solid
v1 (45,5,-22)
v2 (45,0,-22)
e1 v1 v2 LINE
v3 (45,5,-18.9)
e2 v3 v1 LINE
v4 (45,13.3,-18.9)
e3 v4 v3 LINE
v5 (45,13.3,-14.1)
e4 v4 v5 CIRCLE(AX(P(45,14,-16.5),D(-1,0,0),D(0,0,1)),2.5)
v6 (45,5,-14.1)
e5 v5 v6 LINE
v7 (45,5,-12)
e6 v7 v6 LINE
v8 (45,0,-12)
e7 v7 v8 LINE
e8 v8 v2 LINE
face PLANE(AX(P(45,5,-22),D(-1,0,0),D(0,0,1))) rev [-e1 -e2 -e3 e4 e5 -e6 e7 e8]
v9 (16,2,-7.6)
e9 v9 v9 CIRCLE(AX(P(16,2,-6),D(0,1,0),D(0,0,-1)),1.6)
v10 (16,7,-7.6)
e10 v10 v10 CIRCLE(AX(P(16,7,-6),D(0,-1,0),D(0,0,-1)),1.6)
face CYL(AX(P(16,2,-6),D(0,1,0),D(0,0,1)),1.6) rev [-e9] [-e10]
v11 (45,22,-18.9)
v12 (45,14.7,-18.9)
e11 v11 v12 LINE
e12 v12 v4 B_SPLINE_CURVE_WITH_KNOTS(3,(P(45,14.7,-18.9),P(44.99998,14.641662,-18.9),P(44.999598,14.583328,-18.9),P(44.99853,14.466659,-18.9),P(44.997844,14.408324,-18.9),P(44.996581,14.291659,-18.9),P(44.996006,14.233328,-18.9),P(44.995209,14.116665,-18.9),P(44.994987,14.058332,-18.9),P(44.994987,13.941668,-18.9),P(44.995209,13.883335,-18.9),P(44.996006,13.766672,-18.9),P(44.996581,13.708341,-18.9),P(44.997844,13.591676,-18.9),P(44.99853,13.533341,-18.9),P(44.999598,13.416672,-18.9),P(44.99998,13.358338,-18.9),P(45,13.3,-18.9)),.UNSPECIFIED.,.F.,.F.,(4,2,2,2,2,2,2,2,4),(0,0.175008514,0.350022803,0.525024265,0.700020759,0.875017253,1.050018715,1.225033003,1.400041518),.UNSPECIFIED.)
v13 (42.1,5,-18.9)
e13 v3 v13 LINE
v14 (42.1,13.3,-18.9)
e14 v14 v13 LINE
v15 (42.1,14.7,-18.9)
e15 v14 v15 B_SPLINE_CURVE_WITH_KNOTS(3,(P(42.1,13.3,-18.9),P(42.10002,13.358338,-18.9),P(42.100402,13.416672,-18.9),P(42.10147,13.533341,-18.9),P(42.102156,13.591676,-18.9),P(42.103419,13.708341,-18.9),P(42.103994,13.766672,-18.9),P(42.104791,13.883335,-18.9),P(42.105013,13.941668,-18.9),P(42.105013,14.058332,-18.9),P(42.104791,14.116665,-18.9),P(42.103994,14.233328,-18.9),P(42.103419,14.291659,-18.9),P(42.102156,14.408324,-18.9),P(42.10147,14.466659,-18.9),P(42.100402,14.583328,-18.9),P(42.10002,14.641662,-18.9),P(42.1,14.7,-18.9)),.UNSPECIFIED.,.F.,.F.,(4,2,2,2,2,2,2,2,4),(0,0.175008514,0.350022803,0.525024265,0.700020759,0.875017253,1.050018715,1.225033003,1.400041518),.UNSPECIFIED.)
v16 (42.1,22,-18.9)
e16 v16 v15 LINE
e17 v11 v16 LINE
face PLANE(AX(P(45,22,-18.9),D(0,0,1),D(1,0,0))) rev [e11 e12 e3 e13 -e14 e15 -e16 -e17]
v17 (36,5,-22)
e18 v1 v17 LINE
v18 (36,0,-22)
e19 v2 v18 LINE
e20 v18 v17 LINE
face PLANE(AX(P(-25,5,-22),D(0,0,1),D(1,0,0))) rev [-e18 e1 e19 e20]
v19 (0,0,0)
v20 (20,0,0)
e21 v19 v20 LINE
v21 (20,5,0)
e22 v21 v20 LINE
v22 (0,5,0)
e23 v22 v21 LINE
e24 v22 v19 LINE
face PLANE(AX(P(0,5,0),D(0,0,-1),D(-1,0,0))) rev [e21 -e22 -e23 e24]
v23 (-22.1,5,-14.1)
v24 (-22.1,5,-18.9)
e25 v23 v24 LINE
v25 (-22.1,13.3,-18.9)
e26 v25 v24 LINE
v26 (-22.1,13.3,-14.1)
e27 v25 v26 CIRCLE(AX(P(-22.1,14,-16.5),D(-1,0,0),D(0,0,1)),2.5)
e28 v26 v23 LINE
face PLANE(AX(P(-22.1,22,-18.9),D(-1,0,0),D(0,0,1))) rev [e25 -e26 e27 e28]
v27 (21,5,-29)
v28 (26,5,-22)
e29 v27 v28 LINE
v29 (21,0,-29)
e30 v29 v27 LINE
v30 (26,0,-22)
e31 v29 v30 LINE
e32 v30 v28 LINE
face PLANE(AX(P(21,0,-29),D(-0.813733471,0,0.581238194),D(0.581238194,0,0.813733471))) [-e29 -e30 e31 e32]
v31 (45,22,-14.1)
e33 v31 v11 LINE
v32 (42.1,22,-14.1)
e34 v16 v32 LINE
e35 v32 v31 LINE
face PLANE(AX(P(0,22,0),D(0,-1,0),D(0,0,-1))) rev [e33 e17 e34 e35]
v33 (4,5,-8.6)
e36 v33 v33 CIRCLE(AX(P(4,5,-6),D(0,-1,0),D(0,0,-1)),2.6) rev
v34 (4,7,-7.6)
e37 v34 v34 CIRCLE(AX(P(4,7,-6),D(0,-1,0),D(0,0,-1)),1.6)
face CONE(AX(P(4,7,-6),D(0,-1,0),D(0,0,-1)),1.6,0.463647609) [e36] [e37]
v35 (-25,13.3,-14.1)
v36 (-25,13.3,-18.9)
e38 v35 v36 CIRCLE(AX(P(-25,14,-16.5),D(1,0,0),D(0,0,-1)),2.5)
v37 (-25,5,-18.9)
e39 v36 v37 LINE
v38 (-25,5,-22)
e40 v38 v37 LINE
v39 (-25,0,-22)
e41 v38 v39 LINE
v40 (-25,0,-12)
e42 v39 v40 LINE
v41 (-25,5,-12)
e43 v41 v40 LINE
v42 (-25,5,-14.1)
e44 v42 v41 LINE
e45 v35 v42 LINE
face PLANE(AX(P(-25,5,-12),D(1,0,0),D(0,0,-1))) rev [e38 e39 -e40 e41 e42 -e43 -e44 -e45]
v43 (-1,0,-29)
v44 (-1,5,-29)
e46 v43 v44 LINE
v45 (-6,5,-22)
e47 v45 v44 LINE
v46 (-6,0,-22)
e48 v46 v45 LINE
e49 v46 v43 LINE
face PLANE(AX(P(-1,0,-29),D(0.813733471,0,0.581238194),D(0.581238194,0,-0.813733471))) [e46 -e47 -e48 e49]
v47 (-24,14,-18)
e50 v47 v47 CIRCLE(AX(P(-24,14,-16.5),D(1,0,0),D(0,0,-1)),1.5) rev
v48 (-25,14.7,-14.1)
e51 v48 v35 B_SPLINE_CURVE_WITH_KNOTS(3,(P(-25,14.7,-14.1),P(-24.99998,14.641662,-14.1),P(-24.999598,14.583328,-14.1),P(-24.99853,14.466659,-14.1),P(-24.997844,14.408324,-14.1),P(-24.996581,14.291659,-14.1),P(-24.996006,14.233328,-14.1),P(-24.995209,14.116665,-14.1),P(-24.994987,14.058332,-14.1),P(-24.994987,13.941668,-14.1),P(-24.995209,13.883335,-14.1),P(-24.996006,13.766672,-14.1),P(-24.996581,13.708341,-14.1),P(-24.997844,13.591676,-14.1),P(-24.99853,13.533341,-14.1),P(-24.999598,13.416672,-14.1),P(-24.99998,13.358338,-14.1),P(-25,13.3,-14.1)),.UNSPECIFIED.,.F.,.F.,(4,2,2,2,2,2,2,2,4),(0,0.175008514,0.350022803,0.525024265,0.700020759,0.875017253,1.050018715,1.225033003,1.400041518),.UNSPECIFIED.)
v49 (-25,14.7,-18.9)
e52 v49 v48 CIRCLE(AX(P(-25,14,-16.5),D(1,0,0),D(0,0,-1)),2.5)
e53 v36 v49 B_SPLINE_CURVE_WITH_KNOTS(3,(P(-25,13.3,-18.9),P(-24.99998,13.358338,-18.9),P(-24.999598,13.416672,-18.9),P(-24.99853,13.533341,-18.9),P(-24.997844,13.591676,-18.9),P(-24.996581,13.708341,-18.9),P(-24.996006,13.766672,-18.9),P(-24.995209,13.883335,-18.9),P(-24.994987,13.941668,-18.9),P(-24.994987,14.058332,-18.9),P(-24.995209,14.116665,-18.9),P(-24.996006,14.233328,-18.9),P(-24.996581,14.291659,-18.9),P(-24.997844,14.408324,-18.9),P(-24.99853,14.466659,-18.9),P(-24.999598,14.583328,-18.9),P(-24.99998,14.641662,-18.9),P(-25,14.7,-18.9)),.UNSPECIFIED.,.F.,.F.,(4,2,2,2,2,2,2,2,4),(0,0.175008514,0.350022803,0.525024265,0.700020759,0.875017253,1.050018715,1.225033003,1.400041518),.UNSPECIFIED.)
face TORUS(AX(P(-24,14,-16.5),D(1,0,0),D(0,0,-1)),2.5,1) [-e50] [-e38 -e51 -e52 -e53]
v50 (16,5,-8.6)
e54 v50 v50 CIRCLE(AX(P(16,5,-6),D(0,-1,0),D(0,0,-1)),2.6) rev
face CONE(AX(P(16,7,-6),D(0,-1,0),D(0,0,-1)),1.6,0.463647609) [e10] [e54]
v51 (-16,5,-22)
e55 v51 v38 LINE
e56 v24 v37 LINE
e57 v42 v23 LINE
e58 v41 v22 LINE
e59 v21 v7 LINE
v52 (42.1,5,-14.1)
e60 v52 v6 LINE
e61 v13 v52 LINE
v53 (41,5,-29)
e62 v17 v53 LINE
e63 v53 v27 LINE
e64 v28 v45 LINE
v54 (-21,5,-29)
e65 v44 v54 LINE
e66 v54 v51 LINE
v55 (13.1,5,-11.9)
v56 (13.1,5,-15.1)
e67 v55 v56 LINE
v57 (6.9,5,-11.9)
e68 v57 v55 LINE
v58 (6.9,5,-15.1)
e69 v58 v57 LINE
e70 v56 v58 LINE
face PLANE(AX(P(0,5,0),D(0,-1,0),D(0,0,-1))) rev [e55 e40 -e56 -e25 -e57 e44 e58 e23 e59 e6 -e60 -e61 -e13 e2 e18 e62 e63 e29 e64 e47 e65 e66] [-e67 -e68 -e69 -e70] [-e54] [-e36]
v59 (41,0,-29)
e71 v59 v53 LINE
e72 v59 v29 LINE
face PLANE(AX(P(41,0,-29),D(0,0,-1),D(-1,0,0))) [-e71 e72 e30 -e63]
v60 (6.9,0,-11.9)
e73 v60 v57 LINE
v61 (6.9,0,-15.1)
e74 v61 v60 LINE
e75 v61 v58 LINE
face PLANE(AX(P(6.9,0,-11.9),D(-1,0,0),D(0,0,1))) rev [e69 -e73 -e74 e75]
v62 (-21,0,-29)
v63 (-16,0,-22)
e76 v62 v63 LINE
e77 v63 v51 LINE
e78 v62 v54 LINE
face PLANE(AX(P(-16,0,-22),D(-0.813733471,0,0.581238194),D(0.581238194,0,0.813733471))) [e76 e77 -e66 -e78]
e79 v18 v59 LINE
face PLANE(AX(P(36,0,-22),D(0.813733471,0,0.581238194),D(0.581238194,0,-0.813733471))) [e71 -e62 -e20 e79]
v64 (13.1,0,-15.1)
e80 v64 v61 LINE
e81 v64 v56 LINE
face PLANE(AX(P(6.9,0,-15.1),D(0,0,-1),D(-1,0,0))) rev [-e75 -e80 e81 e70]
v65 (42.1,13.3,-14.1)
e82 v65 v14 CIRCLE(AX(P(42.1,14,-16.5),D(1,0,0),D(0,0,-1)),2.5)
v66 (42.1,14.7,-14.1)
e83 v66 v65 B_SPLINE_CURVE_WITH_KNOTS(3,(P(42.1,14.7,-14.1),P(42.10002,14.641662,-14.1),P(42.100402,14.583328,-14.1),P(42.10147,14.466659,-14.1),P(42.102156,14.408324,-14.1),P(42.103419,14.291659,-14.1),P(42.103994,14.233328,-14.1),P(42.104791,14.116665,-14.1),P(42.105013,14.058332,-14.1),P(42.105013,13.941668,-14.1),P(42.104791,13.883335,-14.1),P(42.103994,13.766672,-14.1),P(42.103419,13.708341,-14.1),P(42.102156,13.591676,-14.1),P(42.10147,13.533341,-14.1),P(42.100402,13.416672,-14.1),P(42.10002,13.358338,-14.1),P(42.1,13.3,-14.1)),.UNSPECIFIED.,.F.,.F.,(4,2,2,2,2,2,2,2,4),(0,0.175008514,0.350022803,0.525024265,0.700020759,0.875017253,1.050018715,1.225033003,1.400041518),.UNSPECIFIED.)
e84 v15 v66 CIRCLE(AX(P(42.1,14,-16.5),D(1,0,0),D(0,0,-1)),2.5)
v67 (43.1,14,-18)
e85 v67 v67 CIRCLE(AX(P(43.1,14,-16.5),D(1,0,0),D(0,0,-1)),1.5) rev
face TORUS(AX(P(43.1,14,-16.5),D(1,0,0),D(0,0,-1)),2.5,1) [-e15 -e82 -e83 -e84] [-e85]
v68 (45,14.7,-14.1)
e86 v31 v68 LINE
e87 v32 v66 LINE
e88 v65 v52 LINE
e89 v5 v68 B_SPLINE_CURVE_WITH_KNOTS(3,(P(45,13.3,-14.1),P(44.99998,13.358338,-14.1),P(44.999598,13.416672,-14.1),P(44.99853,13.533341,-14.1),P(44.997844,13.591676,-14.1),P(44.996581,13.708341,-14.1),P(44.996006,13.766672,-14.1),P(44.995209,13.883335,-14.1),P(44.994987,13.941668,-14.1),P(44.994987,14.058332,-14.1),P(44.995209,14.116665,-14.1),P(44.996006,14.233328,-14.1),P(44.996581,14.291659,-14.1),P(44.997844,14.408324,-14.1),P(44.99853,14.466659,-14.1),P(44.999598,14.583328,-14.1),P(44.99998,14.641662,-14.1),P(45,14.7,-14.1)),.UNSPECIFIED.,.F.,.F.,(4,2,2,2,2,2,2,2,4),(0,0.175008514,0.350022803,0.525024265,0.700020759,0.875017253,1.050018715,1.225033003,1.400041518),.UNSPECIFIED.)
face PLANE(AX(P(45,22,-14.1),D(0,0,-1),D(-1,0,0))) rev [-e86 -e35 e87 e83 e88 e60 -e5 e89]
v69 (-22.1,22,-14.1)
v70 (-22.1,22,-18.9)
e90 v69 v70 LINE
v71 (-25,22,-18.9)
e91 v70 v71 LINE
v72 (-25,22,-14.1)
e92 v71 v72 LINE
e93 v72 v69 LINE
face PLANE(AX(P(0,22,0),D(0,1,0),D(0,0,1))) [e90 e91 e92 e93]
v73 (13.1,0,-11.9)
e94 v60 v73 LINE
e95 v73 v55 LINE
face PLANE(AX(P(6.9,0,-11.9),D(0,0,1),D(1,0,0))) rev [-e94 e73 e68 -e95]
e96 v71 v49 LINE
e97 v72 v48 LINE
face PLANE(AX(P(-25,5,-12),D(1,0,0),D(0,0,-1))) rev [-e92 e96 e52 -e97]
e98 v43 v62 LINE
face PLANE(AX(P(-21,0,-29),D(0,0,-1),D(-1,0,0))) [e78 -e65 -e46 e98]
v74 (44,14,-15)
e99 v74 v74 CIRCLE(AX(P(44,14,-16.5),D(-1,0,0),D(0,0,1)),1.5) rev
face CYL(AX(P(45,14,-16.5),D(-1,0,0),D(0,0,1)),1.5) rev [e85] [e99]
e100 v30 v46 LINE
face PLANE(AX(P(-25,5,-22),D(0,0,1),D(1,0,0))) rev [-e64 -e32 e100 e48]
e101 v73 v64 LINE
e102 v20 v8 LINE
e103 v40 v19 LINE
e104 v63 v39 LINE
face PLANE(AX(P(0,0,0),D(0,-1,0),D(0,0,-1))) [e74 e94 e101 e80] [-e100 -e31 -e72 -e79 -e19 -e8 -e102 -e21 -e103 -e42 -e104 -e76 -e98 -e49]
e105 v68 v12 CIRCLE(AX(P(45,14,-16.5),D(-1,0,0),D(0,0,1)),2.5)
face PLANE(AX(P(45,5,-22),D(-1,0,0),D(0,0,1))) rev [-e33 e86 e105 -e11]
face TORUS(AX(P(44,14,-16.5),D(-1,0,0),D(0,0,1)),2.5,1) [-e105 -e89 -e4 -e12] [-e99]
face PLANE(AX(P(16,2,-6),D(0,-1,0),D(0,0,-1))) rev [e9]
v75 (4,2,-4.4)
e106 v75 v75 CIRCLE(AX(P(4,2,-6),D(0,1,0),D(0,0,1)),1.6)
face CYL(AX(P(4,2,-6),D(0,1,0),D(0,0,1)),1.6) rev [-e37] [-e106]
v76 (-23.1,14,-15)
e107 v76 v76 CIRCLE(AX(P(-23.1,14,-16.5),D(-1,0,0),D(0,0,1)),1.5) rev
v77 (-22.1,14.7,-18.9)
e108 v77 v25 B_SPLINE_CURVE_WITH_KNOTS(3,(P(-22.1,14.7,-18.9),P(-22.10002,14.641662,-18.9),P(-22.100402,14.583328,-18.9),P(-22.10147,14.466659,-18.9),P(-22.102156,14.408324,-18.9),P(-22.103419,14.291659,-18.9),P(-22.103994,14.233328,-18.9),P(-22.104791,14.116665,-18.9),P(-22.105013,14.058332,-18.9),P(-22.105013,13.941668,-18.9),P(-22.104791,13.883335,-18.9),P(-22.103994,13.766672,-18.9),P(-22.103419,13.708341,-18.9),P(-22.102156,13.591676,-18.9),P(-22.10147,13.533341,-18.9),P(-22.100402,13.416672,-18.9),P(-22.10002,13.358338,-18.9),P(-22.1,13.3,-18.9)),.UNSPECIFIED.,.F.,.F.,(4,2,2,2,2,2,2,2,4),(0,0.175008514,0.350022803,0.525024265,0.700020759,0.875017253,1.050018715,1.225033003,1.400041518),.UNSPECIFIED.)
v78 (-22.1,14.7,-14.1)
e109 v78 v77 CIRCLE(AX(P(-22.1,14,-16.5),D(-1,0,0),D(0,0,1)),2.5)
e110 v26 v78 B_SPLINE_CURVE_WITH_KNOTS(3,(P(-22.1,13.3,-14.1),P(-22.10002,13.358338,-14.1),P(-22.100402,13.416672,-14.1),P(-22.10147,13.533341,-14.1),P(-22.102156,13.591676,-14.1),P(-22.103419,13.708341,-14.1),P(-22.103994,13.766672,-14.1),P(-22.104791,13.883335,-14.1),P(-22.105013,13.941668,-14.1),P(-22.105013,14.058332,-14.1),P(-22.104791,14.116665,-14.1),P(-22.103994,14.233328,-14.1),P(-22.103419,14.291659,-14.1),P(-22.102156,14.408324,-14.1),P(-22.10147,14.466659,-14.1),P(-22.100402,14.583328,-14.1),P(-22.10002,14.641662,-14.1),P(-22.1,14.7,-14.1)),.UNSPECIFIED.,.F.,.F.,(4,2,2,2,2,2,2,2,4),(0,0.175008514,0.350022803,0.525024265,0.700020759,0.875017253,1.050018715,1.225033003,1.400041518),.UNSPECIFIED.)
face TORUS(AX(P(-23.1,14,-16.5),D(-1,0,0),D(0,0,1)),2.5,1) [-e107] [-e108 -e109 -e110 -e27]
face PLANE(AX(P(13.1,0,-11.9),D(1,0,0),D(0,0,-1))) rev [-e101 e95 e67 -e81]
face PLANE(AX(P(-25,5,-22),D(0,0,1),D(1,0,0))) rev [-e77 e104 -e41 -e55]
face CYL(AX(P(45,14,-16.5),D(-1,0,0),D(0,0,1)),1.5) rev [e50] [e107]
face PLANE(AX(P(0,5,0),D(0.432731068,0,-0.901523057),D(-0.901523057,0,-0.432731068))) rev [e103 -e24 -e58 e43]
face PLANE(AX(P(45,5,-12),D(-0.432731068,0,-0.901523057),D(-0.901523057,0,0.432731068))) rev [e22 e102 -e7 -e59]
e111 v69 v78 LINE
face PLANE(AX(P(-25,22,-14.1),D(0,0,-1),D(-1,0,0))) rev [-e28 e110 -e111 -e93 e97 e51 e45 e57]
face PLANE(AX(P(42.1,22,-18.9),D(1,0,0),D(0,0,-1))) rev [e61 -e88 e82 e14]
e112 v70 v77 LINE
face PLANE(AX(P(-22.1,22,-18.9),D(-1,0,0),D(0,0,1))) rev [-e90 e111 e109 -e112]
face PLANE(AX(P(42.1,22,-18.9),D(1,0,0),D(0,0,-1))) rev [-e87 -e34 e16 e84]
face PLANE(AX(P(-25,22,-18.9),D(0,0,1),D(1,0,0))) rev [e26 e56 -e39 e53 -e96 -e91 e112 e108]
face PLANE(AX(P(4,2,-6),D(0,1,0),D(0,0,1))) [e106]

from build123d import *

# Parameters (mm, degrees)
BOSS_EXTRUDE1_DEPTH = 5
SKETCH2_R           = 1.6
CUT_EXTRUDE1_DEPTH  = 3
SKETCH10_W          = 2.9
SKETCH10_H          = 4.8
BOSS_EXTRUDE2_DEPTH = 17
SKETCH9_W           = 6.2
SKETCH9_H           = 3.2
CUT_EXTRUDE4_DEPTH  = 5
SKETCH11_R          = 1.5
CUT_EXTRUDE5_DEPTH  = 70
FILLET3_R           = 1
FILLET4_R           = 1
FILLET6_R           = 1
FILLET7_R           = 1
BOSS_EXTRUDE4_DEPTH = 5


with BuildPart() as part:
    # Sketch1 → Boss-Extrude1 (new body)
    with BuildSketch(Plane(origin=(0, 0, 0), x_dir=(1, 0, 0), z_dir=(0, 1, 0))):
        Polygon((0, 0), (20, 0), (45, 12), (45, 22), (-25, 22), (-25, 12), align=None)
    extrude(amount=BOSS_EXTRUDE1_DEPTH)

    # Sketch2 → Cut-Extrude1 (cut)
    with BuildSketch(Plane(origin=(0, 5, 0), x_dir=(1, 0, 0), z_dir=(0, 1, 0))):
        with Locations(Location((4, 6, 0), (0, 0, 270))):
            Circle(SKETCH2_R)
        with Locations(Location((16, 6, 0), (0, 0, 90))):
            Circle(SKETCH2_R)
    extrude(amount=-CUT_EXTRUDE1_DEPTH, mode=Mode.SUBTRACT)

    # Sketch6 → Revolve1 (revolve)
    with BuildSketch(Plane.XY.offset(-6), mode=Mode.PRIVATE) as revolve1_sk:
        Polygon((2.4, 5), (2.4, 7), (1.4, 5), align=None)
    revolve(revolve1_sk.sketch.rotate(Axis((4, 5, -6), (0, 1, 0)), 270), axis=Axis((4, 5, -6), (0, 1, 0)))

    # Sketch7 → Revolve2 (revolve)
    with BuildSketch(Plane.XY.offset(-6), mode=Mode.PRIVATE) as revolve2_sk:
        Polygon((14.4, 5), (14.4, 7), (13.4, 5), align=None)
    revolve(revolve2_sk.sketch.rotate(Axis((16, 5, -6), (0, 1, 0)), 270), axis=Axis((16, 5, -6), (0, 1, 0)))

    # Sketch10 → Boss-Extrude2 (add)
    with BuildSketch(Plane(origin=(0, 5, 0), x_dir=(1, 0, 0), z_dir=(0, 1, 0))):
        with Locations((-23.55, 16.5)):
            Rectangle(SKETCH10_W, SKETCH10_H)
        with Locations((43.55, 16.5)):
            Rectangle(SKETCH10_W, SKETCH10_H)
    extrude(amount=BOSS_EXTRUDE2_DEPTH)

    # Sketch9 → Cut-Extrude4 (cut)
    with BuildSketch(Plane(origin=(0, 5, 0), x_dir=(1, 0, 0), z_dir=(0, 1, 0))):
        with Locations((10, 13.5)):
            Rectangle(SKETCH9_W, SKETCH9_H)
    extrude(amount=-CUT_EXTRUDE4_DEPTH, mode=Mode.SUBTRACT)

    # Sketch11 → Cut-Extrude5 (cut)
    with BuildSketch(Plane.ZY.offset(25)):
        with Locations((-16.5, 14)):
            Circle(SKETCH11_R)
    extrude(amount=-CUT_EXTRUDE5_DEPTH, mode=Mode.SUBTRACT)

    # Fillet3
    # the kernel refuses this fillet: 1 mm, written as the material it takes off along each edge
    with BuildSketch(Plane(origin=(-25, 14, -16.5), x_dir=(0, 0, 1), z_dir=(0, -1, 0))) as fillet3_piece_1:
        with BuildLine():
            CenterArc((1.5 + FILLET3_R, -FILLET3_R), FILLET3_R, 90, 90)
            Line((1.5, -FILLET3_R), (1.5, 0))
            Line((1.5, 0), (1.5 + FILLET3_R, 0))
        make_face()
    revolve(axis=Axis((-25, 14, -16.5), (-1, 0, 0)), mode=Mode.SUBTRACT)

    # Fillet4
    # the kernel refuses this fillet: 1 mm, written as the material it takes off along each edge
    with BuildSketch(Plane(origin=(-22.1, 14, -16.5), x_dir=(0, 0, 1), z_dir=(0, -1, 0))) as fillet4_piece_1:
        with BuildLine():
            CenterArc((1.5 + FILLET4_R, FILLET4_R), FILLET4_R, 180, 90)
            Line((1.5, FILLET4_R), (1.5, 0))
            Line((1.5, 0), (1.5 + FILLET4_R, 0))
        make_face()
    revolve(axis=Axis((-22.1, 14, -16.5), (-1, 0, 0)), mode=Mode.SUBTRACT)

    # Fillet6
    # the kernel refuses this fillet: 1 mm, written as the material it takes off along each edge
    with BuildSketch(Plane(origin=(42.1, 14, -16.5), x_dir=(0, 0, 1), z_dir=(0, -1, 0))) as fillet6_piece_1:
        with BuildLine():
            CenterArc((1.5 + FILLET6_R, -FILLET6_R), FILLET6_R, 90, 90)
            Line((1.5, -FILLET6_R), (1.5, 0))
            Line((1.5, 0), (1.5 + FILLET6_R, 0))
        make_face()
    revolve(axis=Axis((42.1, 14, -16.5), (-1, 0, 0)), mode=Mode.SUBTRACT)

    # Fillet7
    # the kernel refuses this fillet: 1 mm, written as the material it takes off along each edge
    with BuildSketch(Plane(origin=(45, 14, -16.5), x_dir=(0, 0, 1), z_dir=(0, -1, 0))) as fillet7_piece_1:
        with BuildLine():
            CenterArc((1.5 + FILLET7_R, FILLET7_R), FILLET7_R, 180, 90)
            Line((1.5, FILLET7_R), (1.5, 0))
            Line((1.5, 0), (1.5 + FILLET7_R, 0))
        make_face()
    revolve(axis=Axis((45, 14, -16.5), (-1, 0, 0)), mode=Mode.SUBTRACT)

    # Sketch13 → Boss-Extrude4 (add)
    with BuildSketch(Plane(origin=(0, 5, 0), x_dir=(1, 0, 0), z_dir=(0, 1, 0))):
        Polygon((-16, 22), (-21, 29), (-1, 29), (-6, 22), align=None)
        Polygon((21, 29), (26, 22), (36, 22), (41, 29), align=None)
    extrude(amount=-BOSS_EXTRUDE4_DEPTH)


solid = part.part
